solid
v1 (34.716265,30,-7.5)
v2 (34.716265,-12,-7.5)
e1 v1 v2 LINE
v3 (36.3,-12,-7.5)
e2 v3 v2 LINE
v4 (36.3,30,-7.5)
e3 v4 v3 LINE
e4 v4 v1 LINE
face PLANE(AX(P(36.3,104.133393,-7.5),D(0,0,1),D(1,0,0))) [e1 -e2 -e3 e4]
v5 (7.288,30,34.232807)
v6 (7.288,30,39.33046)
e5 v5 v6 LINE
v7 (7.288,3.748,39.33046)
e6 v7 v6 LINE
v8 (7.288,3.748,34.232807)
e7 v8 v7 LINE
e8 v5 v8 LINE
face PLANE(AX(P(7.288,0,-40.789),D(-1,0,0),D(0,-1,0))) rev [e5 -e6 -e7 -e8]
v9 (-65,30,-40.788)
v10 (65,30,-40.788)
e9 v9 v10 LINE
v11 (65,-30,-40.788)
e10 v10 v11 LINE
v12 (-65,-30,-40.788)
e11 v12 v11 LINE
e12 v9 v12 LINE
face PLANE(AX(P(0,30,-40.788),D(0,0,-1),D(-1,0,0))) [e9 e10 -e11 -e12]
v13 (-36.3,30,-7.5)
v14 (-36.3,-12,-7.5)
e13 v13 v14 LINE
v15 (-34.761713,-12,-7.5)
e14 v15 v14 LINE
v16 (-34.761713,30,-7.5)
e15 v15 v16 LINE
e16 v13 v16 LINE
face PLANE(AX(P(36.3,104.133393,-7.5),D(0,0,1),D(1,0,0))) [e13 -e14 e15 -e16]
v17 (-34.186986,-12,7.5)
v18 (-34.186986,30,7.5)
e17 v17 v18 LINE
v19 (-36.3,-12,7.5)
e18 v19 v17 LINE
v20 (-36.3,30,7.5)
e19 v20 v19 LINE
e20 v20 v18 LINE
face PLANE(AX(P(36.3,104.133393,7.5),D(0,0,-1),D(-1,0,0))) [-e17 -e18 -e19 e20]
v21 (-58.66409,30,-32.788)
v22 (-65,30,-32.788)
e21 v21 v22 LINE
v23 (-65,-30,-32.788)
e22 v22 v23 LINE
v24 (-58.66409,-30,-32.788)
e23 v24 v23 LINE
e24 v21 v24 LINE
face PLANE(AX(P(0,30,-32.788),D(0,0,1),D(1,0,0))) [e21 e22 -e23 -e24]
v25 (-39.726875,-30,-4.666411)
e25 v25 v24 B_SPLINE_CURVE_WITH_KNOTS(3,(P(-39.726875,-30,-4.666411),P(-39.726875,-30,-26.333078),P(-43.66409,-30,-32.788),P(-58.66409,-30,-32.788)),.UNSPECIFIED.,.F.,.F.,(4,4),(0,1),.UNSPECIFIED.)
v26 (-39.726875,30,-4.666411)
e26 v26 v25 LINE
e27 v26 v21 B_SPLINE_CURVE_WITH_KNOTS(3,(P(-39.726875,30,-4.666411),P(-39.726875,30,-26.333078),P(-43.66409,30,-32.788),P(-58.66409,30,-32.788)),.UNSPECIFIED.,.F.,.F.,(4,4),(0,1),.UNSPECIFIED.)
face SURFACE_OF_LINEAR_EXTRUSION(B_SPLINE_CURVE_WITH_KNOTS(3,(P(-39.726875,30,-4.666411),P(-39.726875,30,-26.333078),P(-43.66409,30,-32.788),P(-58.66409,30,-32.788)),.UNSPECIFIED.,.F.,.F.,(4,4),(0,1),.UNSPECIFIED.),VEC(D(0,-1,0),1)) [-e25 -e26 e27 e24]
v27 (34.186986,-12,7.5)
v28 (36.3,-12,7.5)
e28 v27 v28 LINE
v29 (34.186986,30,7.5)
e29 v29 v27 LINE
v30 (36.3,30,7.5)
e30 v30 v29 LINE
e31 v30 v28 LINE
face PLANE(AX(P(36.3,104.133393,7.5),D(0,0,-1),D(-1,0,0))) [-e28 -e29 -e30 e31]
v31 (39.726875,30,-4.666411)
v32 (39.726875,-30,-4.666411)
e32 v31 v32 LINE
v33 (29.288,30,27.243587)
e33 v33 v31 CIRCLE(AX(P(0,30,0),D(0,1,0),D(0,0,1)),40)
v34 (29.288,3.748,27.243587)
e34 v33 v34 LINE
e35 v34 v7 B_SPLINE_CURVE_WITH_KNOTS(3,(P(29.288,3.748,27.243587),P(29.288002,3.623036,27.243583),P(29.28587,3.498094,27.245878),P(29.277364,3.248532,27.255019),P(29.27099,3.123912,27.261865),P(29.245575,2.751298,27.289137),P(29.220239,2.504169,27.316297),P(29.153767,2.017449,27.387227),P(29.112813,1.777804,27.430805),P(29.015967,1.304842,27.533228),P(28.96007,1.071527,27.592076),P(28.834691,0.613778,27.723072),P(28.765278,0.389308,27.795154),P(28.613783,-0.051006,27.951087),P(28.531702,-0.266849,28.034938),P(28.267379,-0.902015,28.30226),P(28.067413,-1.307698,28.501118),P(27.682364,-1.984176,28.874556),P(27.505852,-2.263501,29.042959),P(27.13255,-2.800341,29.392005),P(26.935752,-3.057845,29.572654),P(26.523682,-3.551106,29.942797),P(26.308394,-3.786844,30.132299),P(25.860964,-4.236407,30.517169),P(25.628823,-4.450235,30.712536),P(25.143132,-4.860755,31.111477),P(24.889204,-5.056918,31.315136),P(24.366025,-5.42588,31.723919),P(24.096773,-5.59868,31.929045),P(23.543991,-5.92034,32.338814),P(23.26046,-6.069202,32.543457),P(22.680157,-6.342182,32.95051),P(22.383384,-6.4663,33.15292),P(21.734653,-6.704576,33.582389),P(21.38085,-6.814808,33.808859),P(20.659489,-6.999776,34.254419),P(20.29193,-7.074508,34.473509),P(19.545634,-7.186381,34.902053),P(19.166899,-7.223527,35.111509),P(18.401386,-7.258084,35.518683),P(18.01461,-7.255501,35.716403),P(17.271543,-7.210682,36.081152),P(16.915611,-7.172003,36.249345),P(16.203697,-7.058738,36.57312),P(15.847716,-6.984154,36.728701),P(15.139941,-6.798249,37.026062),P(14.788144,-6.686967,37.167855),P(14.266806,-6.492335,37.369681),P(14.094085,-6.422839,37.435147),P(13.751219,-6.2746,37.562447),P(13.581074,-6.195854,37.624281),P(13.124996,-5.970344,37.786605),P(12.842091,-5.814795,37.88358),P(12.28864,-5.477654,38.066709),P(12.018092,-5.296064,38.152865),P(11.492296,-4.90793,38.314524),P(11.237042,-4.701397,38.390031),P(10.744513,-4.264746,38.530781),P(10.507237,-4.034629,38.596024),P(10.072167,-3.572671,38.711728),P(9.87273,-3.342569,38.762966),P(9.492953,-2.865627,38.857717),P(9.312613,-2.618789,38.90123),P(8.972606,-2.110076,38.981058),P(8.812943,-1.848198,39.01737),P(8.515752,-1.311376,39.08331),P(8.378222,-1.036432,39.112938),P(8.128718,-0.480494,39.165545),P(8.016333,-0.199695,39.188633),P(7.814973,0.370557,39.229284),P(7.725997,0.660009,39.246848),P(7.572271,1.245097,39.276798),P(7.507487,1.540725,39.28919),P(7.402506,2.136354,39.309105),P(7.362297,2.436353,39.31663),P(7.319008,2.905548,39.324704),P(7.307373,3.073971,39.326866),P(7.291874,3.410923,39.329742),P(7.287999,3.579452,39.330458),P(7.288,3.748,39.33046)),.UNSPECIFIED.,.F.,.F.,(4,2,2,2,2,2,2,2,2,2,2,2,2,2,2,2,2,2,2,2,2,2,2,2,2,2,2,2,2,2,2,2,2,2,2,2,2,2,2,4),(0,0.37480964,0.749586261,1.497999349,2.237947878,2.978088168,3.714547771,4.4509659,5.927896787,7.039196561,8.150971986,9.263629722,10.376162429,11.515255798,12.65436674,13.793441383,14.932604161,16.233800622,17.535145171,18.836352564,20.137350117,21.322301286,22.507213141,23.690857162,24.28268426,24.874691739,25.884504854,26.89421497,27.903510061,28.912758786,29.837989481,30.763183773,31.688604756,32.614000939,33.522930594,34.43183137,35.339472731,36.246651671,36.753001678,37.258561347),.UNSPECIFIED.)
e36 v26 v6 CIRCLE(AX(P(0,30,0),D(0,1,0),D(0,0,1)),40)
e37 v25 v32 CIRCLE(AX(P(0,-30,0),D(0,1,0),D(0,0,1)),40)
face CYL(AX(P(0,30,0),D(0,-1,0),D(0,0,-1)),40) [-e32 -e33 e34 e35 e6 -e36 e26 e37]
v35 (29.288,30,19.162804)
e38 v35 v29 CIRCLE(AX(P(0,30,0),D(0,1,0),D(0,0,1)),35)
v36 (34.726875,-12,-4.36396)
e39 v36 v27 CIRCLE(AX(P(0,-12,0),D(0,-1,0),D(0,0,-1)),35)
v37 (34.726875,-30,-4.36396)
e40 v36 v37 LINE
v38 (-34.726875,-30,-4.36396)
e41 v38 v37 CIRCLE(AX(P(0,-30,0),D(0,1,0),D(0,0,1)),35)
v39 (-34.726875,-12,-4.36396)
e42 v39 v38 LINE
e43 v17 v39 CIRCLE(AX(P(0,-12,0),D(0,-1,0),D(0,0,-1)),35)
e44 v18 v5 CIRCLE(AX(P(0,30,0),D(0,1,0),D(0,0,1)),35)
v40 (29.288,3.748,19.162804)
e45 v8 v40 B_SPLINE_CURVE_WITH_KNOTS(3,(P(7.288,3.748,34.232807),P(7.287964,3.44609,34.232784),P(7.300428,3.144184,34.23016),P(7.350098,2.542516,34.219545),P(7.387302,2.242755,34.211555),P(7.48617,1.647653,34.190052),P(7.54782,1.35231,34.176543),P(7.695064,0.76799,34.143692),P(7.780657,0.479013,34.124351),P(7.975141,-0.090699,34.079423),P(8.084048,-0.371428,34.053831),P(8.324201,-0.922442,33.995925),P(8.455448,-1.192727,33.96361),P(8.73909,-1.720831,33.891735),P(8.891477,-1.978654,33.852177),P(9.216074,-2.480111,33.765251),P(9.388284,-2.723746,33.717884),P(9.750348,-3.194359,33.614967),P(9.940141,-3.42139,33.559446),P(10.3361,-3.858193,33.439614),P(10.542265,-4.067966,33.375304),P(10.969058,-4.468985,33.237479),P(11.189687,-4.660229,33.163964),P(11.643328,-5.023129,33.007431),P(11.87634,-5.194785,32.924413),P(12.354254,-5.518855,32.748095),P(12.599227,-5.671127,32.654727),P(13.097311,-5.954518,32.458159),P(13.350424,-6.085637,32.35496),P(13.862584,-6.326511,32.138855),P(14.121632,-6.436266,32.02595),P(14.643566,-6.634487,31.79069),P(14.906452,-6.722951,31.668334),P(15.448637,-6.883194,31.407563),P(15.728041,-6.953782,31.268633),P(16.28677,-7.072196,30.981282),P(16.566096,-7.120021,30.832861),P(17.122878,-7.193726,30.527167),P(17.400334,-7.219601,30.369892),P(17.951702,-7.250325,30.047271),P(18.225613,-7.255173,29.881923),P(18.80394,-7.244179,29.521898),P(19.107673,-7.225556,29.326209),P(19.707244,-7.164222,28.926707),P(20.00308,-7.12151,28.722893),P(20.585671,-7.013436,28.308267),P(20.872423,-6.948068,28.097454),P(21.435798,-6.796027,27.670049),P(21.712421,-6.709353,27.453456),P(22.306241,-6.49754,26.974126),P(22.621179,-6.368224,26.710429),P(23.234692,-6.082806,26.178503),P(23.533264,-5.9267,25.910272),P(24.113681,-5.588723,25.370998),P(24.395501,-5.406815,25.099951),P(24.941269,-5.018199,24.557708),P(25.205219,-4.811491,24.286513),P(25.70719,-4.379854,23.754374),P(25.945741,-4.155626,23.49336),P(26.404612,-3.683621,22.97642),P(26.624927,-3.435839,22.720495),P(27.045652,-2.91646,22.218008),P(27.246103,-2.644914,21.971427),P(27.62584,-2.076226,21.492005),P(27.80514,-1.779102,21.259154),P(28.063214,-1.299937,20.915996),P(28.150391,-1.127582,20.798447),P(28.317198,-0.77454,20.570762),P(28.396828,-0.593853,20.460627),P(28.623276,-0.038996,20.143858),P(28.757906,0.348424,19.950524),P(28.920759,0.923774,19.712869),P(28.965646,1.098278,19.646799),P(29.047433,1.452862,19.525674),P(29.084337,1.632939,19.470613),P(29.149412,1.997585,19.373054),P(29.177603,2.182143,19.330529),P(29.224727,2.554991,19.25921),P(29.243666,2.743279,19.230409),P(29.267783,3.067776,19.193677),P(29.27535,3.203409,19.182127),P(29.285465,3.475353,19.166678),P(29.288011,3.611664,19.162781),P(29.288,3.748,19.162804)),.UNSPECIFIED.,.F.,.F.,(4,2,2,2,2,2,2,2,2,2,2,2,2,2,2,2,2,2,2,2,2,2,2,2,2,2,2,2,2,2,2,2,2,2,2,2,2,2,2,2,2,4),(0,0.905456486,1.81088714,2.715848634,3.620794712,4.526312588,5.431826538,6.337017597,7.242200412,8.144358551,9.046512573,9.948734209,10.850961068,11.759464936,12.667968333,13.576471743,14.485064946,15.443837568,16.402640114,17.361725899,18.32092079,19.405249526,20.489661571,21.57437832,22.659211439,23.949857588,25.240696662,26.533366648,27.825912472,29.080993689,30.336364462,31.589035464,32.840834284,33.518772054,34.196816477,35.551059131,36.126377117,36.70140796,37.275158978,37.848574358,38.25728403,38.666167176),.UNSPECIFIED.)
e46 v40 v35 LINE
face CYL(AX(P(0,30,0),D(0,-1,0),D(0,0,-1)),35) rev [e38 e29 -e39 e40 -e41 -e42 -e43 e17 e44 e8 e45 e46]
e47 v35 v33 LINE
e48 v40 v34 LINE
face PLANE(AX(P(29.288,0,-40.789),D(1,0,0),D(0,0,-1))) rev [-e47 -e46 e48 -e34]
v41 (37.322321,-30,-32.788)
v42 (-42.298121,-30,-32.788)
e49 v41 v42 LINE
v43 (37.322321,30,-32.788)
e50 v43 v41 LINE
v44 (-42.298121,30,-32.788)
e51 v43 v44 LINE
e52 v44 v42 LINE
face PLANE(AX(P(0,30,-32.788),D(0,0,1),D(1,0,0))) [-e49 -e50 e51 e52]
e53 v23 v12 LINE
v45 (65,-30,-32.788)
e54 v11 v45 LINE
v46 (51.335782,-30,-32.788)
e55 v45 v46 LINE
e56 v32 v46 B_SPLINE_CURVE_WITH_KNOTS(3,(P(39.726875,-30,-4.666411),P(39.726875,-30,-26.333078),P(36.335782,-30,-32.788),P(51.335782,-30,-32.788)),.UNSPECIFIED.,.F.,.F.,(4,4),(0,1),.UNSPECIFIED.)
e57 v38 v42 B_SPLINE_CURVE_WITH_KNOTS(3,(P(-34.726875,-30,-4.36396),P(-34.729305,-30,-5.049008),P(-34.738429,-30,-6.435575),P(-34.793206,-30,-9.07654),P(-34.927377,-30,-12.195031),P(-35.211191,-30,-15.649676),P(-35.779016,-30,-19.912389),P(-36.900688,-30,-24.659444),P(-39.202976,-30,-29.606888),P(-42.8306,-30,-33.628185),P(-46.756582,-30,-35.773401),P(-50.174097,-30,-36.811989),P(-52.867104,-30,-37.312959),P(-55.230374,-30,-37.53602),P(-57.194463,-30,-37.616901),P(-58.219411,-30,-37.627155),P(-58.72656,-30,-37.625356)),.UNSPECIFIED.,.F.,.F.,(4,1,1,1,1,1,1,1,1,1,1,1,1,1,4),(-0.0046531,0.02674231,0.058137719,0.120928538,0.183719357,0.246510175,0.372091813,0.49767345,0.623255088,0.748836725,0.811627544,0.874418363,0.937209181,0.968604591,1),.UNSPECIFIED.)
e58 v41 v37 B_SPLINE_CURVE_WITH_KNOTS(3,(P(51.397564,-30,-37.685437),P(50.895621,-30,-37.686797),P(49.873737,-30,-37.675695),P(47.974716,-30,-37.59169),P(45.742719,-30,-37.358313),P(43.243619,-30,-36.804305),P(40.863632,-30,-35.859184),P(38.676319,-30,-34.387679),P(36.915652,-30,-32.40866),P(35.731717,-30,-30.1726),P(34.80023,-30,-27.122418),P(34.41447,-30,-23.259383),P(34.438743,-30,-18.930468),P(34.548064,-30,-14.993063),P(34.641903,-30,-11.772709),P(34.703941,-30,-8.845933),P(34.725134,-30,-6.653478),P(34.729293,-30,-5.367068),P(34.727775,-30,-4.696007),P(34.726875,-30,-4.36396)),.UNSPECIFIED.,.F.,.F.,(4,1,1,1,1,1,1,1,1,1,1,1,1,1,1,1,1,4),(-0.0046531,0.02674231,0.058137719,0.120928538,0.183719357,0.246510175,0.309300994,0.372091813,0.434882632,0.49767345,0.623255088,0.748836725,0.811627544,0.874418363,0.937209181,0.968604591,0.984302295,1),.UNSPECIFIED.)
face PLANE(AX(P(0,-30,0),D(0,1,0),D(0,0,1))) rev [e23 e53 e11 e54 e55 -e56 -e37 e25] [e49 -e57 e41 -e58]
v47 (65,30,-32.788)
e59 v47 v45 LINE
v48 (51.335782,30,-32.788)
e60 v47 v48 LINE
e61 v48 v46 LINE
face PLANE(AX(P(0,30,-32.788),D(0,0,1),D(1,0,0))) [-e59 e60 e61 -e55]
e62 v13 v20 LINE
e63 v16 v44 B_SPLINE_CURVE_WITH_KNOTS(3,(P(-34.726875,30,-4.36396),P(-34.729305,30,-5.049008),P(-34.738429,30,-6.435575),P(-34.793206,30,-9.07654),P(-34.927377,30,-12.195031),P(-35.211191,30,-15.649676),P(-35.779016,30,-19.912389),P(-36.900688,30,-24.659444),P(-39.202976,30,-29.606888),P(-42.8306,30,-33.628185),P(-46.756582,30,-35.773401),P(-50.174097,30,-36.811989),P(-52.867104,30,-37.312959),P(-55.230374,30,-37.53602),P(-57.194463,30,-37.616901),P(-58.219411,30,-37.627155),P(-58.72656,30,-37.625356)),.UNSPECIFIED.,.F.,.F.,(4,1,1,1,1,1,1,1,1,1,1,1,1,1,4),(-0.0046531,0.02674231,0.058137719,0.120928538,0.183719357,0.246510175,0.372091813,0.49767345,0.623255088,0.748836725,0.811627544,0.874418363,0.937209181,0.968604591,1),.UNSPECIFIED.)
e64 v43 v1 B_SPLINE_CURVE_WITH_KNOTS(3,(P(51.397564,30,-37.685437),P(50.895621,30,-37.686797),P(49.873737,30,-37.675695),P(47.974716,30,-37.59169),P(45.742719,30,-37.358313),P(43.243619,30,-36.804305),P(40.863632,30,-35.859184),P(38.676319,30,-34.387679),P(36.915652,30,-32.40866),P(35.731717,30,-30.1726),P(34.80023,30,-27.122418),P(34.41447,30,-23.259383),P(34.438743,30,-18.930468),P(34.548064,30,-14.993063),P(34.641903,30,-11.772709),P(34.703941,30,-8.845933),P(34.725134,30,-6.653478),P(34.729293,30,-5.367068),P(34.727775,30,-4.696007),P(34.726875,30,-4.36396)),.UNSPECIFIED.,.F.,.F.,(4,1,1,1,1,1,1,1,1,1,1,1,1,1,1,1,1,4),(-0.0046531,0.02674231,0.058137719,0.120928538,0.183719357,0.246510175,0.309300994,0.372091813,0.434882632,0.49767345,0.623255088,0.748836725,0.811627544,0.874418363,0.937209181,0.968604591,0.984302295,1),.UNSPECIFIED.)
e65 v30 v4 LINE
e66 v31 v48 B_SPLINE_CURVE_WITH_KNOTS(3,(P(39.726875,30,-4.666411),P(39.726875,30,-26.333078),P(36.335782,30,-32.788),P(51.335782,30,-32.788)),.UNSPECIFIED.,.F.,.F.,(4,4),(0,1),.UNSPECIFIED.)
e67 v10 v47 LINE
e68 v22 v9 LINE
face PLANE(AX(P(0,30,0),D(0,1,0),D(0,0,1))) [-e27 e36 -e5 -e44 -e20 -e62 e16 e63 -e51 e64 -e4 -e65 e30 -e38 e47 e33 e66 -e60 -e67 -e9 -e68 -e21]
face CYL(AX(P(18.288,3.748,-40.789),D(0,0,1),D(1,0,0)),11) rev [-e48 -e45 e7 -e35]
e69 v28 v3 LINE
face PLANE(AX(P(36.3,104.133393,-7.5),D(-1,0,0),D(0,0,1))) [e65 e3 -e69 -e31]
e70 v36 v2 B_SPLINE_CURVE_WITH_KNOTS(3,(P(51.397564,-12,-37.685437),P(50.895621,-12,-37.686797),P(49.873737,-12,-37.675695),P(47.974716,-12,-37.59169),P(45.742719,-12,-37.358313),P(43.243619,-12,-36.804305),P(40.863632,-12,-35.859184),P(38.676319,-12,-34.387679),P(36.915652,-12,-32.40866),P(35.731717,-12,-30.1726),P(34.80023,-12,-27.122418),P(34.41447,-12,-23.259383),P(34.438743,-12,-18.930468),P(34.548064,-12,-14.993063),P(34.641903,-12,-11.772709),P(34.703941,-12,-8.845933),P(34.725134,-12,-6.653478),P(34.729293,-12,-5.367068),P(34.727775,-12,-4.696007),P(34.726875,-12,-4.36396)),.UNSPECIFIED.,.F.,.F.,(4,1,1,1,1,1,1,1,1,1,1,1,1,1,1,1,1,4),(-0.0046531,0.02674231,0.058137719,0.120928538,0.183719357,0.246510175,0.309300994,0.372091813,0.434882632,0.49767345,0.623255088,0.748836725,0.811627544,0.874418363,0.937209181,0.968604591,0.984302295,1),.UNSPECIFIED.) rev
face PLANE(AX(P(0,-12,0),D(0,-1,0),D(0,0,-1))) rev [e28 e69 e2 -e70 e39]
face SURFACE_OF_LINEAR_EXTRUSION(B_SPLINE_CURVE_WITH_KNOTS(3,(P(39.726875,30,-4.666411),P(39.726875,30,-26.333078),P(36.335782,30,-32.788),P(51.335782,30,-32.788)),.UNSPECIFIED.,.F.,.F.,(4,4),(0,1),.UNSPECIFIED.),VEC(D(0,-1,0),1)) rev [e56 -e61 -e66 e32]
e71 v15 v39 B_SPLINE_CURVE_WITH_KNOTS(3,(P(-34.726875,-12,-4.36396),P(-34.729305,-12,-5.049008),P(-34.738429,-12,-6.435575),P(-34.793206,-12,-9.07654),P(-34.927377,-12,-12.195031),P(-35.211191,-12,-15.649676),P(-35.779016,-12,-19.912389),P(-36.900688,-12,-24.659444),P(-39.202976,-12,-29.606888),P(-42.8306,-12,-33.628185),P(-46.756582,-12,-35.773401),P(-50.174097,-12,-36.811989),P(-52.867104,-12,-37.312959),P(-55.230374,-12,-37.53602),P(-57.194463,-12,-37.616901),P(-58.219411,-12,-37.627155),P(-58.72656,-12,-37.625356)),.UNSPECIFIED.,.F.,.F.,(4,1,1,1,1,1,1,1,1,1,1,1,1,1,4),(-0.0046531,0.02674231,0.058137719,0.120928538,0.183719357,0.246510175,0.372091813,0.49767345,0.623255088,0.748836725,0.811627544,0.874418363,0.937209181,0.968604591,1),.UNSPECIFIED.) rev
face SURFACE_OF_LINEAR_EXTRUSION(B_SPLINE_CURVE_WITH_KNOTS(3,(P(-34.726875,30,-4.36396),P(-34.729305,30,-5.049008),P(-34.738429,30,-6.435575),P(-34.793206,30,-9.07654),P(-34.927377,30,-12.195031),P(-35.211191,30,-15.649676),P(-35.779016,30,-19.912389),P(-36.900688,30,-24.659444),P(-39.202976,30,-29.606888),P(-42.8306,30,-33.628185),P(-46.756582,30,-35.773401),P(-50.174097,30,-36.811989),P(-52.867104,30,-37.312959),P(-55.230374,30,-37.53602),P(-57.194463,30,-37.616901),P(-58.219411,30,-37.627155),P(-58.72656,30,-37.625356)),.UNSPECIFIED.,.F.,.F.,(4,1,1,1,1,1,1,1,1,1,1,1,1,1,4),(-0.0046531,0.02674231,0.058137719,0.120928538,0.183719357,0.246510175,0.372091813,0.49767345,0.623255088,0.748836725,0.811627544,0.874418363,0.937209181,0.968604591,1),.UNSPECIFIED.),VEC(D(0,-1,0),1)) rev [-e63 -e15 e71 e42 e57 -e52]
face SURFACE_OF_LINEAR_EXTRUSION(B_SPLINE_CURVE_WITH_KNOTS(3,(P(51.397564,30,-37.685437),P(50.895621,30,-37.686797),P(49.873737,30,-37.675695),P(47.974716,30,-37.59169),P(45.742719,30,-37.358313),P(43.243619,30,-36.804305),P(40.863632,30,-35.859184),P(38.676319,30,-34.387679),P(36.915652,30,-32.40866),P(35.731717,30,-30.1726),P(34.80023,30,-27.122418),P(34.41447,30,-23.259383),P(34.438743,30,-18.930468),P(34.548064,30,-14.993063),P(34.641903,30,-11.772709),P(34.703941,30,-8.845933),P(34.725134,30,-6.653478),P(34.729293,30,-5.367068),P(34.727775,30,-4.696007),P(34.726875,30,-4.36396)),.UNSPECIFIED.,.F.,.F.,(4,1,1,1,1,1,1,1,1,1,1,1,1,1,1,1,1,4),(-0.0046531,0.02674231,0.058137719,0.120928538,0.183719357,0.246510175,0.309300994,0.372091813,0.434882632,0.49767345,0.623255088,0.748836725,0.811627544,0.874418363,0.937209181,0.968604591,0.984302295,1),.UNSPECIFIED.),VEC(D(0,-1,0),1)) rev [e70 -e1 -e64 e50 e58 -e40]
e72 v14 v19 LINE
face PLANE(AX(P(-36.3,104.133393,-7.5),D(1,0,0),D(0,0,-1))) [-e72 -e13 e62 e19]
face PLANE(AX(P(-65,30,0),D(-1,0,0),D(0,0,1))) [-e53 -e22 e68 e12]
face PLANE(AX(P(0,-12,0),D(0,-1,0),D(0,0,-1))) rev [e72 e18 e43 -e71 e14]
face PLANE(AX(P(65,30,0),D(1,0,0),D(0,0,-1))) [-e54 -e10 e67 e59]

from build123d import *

# Parameters (mm, degrees)
BOSS_EXTRUDE2_START     = -30
BOSS_EXTRUDE2_DEPTH     = 60
CUT_EXTRUDE1_DEPTH      = 30
CUT_EXTRUDE1_DEPTH_BACK = 12
SKETCH2_W               = 72.600000086
SKETCH2_H               = 15
CUT_EXTRUDE2_REACH      = 109.943
CUT_EXTRUDE2_END_RADIUS = 35


# Read off the part's stored shape, not the designer's step: Boss-Extrude2
with BuildPart() as part:
    # Boss-Extrude2 outline → Boss-Extrude2 (new body)
    with BuildSketch(Plane(origin=(0, 0, 0), x_dir=(1, 0, 0), z_dir=(0, 1, 0)).offset(BOSS_EXTRUDE2_START)):
        with BuildLine():
            Line((-65, 40.788), (-65, 32.788))
            Line((-65, 32.788), (-58.6640897, 32.788))
            add(Edge.make_bspline(
                [(-39.726875088, 4.666411438), (-39.726875088, 26.333078105), (-43.6640897, 32.788), (-58.6640897, 32.788)],
                knots=[0, 0, 0, 0, 1, 1, 1, 1], degree=3))
            ThreePointArc((-39.726875088, 4.666411438), (0, -40), (39.726875088, 4.666411438))
            add(Edge.make_bspline(
                [(39.726875088, 4.666411438), (39.726875088, 26.333078105), (36.335782116, 32.788), (51.335782116, 32.788)],
                knots=[0, 0, 0, 0, 1, 1, 1, 1], degree=3))
            Line((51.335782116, 32.788), (65, 32.788))
            Line((65, 32.788), (65, 40.788))
            Line((65, 40.788), (-65, 40.788))
        make_face()
        with BuildLine():
            add(Edge.make_bspline(
                [(37.322321234, 32.787999997), (37.214983937, 32.6492714), (36.601118756, 31.814611367), (35.73171702, 30.172599558), (34.800229832, 27.122418367), (34.414470427, 23.259382738), (34.438742851, 18.930468379), (34.548064386, 14.993063003), (34.641903468, 11.772708701), (34.703941427, 8.845933226), (34.725133622, 6.653478096), (34.72929314, 5.367067617), (34.727774909, 4.696007075), (34.726875088, 4.363959967)],
                knots=[0.359345427, 0.359345427, 0.359345427, 0.359345427, 0.372091813, 0.434882632, 0.49767345, 0.623255088, 0.748836725, 0.811627544, 0.874418363, 0.937209181, 0.968604591, 0.984302295, 1, 1, 1, 1], degree=3))
            ThreePointArc((34.726875088, 4.363959967), (0, -35), (-34.726875088, 4.363959967))
            add(Edge.make_bspline(
                [(-34.726875088, 4.363959967), (-34.729305052, 5.049007951), (-34.738428611, 6.435574708), (-34.793206082, 9.076539579), (-34.927377092, 12.195031477), (-35.211190541, 15.649676256), (-35.779016422, 19.912389182), (-36.900687517, 24.659444132), (-39.068630657, 29.318190534), (-41.204796111, 31.813713357), (-42.298121026, 32.787999997)],
                knots=[-0.0046531, -0.0046531, -0.0046531, -0.0046531, 0.02674231, 0.058137719, 0.120928538, 0.183719357, 0.246510175, 0.372091813, 0.49767345, 0.601270914, 0.601270914, 0.601270914, 0.601270914], degree=3))
            Line((-42.298121026, 32.787999997), (37.322321234, 32.787999997))
        make_face(mode=Mode.SUBTRACT)
    extrude(amount=BOSS_EXTRUDE2_DEPTH)

    # Sketch2 → Cut-Extrude1 (cut, two sides: drawn at the far end of the back side and taken through both)
    with BuildSketch(Plane(origin=(0, 0, 0), x_dir=(1, 0, 0), z_dir=(0, 1, 0)).offset(-CUT_EXTRUDE1_DEPTH_BACK)):
        Rectangle(SKETCH2_W, SKETCH2_H)
    extrude(amount=CUT_EXTRUDE1_DEPTH + CUT_EXTRUDE1_DEPTH_BACK, mode=Mode.SUBTRACT)

    # Cut-Extrude2: up to this cylinder (the profile starts outside it)
    cut_extrude2_end = Plane(origin=(0, 12.467931, 0), z_dir=(0, -1, 0)) * Cylinder(CUT_EXTRUDE2_END_RADIUS, 290.886, mode=Mode.PRIVATE)
    # Sketch4 → Cut-Extrude2 (cut, up to the surface)
    with BuildSketch(Plane.XY.offset(40), mode=Mode.PRIVATE) as cut_extrude2_sk1:
        with BuildLine():
            Line((7.288, 30), (7.288, 3.748))
            ThreePointArc((7.288, 3.748), (18.288, -7.252), (29.288, 3.748))
            Line((29.288, 3.748), (29.288, 30))
            Line((29.288, 30), (7.288, 30))
        make_face()
    cut_extrude2_tool1 = extrude(cut_extrude2_sk1.sketch, amount=-CUT_EXTRUDE2_REACH, mode=Mode.PRIVATE) - cut_extrude2_end
    add(cut_extrude2_tool1.solids().sort_by_distance((18.288, 12.467931, 40))[0], mode=Mode.SUBTRACT)


solid = part.part
